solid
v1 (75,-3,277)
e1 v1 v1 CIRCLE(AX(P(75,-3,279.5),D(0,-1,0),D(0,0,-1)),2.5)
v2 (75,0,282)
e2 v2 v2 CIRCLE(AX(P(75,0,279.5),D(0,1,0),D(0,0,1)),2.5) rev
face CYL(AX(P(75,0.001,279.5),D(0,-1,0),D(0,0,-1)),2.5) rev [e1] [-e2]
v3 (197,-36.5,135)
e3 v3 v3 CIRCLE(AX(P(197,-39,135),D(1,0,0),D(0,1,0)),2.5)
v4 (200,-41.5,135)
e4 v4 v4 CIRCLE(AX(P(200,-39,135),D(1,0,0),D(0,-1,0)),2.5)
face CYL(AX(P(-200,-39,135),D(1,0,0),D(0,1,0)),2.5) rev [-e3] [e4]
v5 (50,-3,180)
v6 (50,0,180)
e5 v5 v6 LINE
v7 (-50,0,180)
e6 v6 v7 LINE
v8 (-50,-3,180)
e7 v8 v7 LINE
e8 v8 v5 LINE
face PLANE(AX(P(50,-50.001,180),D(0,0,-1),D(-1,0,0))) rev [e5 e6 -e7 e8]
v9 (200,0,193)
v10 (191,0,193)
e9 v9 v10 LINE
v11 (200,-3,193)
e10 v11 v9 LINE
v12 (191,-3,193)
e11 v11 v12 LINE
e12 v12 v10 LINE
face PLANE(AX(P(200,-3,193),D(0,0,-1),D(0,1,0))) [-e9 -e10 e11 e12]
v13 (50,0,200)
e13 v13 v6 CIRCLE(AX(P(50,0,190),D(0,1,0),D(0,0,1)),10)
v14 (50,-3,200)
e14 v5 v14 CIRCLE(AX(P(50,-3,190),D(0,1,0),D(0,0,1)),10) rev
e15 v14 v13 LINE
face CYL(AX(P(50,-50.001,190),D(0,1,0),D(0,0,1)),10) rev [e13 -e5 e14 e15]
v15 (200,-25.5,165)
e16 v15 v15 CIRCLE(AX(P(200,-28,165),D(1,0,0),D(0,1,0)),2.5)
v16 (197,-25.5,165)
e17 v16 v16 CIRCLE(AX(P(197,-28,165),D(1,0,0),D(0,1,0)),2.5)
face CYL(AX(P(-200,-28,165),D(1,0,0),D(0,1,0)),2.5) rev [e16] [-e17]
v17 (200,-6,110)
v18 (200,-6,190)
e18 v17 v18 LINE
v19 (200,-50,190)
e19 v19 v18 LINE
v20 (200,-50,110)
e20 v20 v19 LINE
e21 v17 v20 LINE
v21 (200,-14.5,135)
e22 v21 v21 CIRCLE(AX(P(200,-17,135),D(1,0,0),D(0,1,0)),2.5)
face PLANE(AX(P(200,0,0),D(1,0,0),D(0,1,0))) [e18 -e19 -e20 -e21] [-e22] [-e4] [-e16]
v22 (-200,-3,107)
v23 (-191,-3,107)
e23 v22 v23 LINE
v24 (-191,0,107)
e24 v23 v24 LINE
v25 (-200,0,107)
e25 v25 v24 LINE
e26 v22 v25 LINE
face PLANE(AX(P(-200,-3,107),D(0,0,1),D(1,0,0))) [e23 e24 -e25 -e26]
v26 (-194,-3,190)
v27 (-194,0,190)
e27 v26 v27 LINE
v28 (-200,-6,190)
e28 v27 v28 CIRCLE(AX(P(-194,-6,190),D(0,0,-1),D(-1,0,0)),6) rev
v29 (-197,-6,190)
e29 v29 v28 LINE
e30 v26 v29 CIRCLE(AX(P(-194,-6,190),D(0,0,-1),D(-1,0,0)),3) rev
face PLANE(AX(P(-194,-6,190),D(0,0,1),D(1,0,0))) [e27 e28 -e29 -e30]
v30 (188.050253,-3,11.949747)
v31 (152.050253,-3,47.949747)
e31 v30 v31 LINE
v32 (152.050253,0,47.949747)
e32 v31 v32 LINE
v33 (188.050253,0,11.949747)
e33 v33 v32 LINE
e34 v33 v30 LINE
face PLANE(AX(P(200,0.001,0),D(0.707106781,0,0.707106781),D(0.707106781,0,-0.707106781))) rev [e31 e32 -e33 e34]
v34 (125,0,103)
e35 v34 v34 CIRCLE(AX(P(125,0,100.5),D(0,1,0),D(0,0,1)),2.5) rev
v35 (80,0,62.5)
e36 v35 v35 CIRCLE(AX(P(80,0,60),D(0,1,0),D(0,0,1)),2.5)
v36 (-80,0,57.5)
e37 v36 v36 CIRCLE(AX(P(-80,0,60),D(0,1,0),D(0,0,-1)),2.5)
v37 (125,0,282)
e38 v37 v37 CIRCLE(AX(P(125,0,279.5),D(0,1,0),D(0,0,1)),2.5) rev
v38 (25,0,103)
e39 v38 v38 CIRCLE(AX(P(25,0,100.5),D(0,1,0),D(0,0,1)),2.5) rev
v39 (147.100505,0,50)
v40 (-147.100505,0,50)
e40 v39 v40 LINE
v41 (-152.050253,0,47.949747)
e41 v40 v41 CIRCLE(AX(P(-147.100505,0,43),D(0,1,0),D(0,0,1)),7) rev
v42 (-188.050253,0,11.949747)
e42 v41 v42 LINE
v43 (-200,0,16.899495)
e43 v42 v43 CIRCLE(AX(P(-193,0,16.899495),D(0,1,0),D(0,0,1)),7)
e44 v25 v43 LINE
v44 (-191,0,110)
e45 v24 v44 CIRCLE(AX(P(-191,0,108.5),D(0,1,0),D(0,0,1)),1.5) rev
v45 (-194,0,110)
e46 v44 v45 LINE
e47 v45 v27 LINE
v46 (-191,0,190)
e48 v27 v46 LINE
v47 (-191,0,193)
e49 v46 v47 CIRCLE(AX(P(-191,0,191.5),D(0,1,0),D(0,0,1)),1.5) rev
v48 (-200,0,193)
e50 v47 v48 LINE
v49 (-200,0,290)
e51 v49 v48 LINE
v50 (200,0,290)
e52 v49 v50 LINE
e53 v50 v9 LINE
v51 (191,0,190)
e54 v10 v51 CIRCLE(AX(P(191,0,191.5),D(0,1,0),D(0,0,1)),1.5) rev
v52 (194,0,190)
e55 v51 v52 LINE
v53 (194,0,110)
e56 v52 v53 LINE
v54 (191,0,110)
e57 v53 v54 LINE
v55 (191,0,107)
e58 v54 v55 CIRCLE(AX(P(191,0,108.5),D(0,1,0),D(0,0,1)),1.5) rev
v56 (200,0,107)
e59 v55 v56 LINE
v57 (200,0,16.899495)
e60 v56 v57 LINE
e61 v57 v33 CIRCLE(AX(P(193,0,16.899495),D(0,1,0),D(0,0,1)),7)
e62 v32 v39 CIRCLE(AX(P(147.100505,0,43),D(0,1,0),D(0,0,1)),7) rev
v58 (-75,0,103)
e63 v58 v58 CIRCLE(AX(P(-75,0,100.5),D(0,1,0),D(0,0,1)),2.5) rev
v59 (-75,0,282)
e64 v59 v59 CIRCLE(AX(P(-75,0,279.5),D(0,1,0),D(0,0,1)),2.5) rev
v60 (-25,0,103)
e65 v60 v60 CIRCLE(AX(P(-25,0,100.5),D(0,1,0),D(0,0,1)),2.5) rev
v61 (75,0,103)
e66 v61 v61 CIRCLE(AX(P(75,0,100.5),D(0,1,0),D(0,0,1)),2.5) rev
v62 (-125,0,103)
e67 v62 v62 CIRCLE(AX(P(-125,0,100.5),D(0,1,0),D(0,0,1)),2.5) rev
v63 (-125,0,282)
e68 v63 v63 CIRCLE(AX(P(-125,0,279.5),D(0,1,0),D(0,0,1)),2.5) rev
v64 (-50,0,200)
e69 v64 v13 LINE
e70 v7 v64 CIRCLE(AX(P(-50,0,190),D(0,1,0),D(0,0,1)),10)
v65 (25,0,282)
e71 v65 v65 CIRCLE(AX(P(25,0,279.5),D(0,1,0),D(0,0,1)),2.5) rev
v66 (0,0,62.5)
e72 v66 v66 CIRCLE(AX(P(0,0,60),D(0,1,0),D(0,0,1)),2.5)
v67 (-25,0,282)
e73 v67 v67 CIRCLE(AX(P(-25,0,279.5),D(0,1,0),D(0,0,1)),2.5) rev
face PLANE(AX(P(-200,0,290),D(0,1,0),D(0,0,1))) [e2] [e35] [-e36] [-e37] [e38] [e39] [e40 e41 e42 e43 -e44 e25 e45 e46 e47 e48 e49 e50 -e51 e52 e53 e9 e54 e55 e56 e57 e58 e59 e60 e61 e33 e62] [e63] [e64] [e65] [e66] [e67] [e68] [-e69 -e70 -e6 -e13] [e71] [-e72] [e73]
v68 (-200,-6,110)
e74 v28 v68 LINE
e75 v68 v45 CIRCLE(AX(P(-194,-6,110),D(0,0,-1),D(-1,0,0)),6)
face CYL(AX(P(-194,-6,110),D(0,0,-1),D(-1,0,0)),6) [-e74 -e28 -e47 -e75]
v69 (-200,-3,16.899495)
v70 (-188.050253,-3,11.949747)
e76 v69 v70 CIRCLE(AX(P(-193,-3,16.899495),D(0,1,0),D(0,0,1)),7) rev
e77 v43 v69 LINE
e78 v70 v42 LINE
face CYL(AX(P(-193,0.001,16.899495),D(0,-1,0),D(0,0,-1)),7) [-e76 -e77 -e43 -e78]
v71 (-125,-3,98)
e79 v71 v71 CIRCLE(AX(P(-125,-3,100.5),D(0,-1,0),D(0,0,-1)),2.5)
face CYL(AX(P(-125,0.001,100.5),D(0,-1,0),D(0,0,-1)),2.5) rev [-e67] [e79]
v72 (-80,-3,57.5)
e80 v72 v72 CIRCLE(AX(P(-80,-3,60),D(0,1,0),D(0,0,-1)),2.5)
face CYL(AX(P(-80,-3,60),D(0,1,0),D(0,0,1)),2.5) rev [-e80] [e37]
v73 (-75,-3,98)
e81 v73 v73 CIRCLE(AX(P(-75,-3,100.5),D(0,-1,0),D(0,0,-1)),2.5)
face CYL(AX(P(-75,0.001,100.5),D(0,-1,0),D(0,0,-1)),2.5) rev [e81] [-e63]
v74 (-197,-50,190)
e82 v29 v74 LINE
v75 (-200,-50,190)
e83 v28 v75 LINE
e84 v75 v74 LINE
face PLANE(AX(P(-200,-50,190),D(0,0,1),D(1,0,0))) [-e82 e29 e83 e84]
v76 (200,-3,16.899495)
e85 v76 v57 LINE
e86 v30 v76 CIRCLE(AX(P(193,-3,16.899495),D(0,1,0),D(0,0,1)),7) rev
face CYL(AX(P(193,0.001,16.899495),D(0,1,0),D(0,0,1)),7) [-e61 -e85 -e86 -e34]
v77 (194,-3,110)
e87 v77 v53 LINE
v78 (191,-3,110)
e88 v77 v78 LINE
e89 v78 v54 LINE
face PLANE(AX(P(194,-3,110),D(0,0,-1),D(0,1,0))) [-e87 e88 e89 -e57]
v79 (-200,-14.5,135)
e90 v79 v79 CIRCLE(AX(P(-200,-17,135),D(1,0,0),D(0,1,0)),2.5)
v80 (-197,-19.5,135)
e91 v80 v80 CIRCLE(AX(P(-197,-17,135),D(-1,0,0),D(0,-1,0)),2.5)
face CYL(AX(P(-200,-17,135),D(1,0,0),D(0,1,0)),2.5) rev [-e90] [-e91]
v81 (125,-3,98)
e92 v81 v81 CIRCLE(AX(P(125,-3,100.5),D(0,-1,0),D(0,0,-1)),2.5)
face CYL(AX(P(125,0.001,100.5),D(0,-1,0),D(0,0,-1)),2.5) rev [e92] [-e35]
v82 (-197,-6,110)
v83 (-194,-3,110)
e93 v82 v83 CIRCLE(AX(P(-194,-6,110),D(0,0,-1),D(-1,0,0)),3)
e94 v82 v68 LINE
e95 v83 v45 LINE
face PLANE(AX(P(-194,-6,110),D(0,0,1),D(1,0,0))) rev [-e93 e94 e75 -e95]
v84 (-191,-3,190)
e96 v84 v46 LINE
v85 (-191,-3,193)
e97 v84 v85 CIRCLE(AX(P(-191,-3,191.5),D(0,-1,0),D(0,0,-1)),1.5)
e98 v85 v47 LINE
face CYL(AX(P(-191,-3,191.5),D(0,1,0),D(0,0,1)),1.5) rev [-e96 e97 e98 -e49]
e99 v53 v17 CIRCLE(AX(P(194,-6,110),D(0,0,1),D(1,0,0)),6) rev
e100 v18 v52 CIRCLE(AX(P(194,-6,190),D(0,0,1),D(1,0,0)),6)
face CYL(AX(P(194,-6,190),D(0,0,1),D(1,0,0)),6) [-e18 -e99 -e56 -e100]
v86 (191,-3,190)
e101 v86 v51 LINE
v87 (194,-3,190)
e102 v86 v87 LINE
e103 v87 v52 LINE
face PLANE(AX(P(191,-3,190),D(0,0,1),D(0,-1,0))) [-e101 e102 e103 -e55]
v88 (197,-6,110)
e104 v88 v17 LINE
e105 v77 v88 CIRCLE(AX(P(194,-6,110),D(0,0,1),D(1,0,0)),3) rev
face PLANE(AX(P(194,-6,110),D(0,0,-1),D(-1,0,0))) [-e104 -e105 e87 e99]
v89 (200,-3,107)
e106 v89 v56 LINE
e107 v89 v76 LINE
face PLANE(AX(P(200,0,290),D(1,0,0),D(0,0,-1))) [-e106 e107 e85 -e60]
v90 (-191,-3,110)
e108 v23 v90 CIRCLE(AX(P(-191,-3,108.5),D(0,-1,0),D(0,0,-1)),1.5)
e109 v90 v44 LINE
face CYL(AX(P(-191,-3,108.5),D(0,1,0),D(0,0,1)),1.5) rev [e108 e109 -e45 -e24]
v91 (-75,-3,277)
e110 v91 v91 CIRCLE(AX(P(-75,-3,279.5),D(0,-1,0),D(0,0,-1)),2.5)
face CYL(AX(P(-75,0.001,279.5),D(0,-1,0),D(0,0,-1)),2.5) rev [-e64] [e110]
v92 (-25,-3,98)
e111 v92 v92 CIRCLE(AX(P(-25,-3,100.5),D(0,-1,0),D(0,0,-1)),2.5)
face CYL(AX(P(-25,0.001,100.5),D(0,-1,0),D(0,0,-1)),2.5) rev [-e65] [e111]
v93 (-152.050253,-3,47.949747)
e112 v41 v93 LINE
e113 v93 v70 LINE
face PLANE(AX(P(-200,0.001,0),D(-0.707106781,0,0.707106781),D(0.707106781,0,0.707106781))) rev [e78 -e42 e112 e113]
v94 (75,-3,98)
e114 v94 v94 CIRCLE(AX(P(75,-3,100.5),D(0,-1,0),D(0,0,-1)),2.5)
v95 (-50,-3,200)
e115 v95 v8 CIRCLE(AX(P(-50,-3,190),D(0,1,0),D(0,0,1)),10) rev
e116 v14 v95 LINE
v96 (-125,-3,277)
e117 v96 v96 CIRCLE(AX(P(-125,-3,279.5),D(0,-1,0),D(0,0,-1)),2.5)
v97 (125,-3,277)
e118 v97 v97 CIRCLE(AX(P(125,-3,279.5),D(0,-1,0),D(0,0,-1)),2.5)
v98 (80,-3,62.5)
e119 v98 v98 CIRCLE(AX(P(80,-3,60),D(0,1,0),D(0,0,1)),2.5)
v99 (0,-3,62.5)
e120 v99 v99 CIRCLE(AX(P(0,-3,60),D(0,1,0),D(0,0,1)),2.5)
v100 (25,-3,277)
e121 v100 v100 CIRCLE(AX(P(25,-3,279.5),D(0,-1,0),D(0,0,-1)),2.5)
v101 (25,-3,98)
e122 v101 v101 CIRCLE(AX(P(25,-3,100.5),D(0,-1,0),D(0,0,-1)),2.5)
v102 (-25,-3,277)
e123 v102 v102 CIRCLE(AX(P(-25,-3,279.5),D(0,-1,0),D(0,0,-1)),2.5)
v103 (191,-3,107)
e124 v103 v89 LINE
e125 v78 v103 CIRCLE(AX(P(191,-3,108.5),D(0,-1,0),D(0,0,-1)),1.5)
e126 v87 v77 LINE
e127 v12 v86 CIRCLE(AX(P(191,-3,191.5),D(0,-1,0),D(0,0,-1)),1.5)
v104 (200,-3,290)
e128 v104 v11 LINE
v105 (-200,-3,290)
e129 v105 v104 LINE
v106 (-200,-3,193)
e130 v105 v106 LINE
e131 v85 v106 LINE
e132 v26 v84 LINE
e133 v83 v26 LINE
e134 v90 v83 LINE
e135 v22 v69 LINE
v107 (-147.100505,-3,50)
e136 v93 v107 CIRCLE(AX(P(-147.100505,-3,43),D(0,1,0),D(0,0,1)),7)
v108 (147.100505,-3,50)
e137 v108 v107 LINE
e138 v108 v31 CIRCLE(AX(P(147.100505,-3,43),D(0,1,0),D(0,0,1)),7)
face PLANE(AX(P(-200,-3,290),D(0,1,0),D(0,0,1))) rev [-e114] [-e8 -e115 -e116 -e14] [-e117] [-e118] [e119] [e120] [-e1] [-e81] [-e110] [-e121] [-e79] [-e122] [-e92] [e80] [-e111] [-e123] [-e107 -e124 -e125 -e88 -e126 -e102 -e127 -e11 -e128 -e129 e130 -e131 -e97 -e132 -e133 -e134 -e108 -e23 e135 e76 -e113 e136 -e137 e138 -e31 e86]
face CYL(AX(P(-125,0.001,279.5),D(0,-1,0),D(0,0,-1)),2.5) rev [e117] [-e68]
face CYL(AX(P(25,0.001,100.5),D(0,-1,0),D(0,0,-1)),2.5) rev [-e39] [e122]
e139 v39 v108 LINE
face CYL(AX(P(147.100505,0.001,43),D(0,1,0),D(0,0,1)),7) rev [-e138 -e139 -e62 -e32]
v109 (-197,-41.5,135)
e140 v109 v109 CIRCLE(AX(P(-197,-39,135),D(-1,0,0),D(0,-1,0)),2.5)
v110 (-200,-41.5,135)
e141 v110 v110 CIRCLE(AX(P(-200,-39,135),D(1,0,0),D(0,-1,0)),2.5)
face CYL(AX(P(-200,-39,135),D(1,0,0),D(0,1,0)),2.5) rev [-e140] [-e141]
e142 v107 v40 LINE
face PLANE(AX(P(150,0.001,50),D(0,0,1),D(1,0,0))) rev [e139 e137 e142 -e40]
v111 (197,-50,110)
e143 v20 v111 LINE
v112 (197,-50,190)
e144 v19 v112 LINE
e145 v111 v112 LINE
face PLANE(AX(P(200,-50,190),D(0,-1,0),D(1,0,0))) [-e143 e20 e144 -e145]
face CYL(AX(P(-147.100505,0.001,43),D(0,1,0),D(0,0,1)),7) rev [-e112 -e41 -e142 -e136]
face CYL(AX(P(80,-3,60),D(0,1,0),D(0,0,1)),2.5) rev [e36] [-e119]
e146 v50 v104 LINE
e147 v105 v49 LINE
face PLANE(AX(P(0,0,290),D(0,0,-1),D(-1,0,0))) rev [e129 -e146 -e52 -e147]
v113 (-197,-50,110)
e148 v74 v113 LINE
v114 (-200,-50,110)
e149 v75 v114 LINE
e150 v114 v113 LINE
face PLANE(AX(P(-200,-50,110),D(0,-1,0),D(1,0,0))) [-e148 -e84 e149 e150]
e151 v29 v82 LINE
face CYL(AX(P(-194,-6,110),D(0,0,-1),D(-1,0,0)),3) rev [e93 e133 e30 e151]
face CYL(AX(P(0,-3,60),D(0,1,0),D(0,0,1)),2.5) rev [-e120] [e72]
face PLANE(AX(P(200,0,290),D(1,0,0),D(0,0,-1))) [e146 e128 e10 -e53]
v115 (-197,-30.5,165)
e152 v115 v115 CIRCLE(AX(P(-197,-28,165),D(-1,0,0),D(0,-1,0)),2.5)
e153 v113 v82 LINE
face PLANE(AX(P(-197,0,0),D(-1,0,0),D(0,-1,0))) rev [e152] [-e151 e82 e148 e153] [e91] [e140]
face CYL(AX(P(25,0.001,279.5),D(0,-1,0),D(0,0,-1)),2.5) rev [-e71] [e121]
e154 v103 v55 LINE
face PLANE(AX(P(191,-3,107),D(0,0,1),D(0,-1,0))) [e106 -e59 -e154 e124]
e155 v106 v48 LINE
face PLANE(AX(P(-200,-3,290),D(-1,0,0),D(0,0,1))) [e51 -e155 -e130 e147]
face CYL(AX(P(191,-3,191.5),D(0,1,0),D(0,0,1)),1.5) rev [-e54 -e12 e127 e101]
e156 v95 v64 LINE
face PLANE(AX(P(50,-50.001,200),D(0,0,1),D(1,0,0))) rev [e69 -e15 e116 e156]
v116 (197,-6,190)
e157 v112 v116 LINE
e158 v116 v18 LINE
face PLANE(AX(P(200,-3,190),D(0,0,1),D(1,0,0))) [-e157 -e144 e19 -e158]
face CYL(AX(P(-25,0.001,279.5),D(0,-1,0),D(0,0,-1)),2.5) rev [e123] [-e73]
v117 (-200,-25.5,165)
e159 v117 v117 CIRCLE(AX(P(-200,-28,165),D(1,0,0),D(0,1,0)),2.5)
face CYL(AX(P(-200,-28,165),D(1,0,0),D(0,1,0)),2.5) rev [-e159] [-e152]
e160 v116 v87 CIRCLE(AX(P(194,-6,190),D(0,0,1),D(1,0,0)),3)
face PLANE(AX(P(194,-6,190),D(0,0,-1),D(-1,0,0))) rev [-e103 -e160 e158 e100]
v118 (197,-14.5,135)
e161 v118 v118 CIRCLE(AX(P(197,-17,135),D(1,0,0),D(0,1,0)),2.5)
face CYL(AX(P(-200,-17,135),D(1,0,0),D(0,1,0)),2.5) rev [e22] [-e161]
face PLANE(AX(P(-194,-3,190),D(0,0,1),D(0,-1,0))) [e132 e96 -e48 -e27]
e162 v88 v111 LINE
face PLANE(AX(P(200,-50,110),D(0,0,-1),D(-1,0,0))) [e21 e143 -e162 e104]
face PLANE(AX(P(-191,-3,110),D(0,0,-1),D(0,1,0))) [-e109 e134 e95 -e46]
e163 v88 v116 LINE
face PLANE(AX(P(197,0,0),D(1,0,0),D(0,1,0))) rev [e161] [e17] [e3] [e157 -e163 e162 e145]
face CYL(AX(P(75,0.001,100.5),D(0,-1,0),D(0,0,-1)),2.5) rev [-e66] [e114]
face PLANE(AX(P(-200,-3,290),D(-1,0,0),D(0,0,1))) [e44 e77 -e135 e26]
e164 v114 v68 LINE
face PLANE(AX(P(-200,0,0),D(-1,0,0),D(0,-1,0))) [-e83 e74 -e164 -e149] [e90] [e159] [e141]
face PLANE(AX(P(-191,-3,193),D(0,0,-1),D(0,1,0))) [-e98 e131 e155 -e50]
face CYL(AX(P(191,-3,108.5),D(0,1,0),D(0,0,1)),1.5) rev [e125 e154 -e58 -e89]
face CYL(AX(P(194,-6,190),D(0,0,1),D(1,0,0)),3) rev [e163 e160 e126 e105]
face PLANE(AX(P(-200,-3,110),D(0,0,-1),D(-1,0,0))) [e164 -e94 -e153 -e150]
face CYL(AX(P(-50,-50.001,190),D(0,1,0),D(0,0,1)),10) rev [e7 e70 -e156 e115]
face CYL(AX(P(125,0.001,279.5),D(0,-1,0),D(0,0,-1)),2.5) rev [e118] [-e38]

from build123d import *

# Parameters (mm, degrees)
SKETCH1_W                = 400
SKETCH1_H                = 3
BASE_FLANGE1_DEPTH       = 290
CUT_EXTRUDE1_REACH       = 354.291
EDGE_FLANGE1_START       = -6
EDGE_FLANGE1_DEPTH       = 7
EDGE_FLANGE1_START_2     = -0.31686
EDGE_FLANGE1_2_OUTLINE_W = 3
EDGE_FLANGE1_2_OUTLINE_H = 80
EDGE_FLANGE1_2_DEPTH     = 1.31686
EDGE_FLANGE1_START_3     = -50
EDGE_FLANGE1_3_OUTLINE_W = 3
EDGE_FLANGE1_3_OUTLINE_H = 80
EDGE_FLANGE1_3_DEPTH     = 44
EDGE_FLANGE1_START_4     = 110
EDGE_FLANGE1_4_DEPTH     = 80
EDGE_FLANGE1_5_DEPTH     = 80
SKETCH15_R               = 2.5
CUT_EXTRUDE2_DEPTH       = 497.588360717
FILLET1_R                = 7
SKETCH16_R               = 2.5
CUT_EXTRUDE3_DEPTH       = 10
CUT_EXTRUDE4_REACH       = 357.4
SKETCH17_R               = 2.5
CUT_EXTRUDE5_REACH       = 357.809


with BuildPart() as part:
    # Base-Flange1: sheet metal written as solids
    # Sketch1 → Base-Flange1 (new body)
    with BuildSketch(Plane.XY):
        with Locations((0, -1.5)):
            Rectangle(SKETCH1_W, SKETCH1_H)
    extrude(amount=BASE_FLANGE1_DEPTH)

    # Sketch6 → Cut-Extrude1 (cut, up to next)
    with BuildSketch(Plane.XZ.offset(3), mode=Mode.PRIVATE) as cut_extrude1_sk1:
        Polygon((200, 0), (150, 50), (-150, 50), (-200, 0), align=None)
    cut_extrude1_tool1 = extrude(cut_extrude1_sk1.sketch, amount=-CUT_EXTRUDE1_REACH, mode=Mode.PRIVATE) & part.part
    add(cut_extrude1_tool1.solids().sort_by_distance((0, -3, 23.809524))[0], mode=Mode.SUBTRACT)

    # Edge-Flange1: read off the stored shape, not the designer's step
    # Edge-Flange1 outline → Edge-Flange1 (cut)
    with BuildSketch(Plane(origin=(0, 0, 0), x_dir=(1, 0, 0), z_dir=(0, 1, 0)).offset(EDGE_FLANGE1_START)):
        with BuildLine():
            Line((200, -193), (200, -190))
            Line((200, -190), (191, -190))
            ThreePointArc((191, -190), (189.5, -191.5), (191, -193))
            Line((191, -193), (200, -193))
        make_face()
        with BuildLine():
            Line((191, -110), (200, -110))
            Line((200, -110), (200, -107))
            Line((200, -107), (191, -107))
            ThreePointArc((191, -107), (189.5, -108.5), (191, -110))
        make_face()
        with BuildLine():
            Line((-200, -107), (-200, -110))
            Line((-200, -110), (-191, -110))
            ThreePointArc((-191, -110), (-189.5, -108.5), (-191, -107))
            Line((-191, -107), (-200, -107))
        make_face()
        with BuildLine():
            Line((-191, -190), (-200, -190))
            Line((-200, -190), (-200, -193))
            Line((-200, -193), (-191, -193))
            ThreePointArc((-191, -193), (-189.5, -191.5), (-191, -190))
        make_face()
    extrude(amount=EDGE_FLANGE1_DEPTH, mode=Mode.SUBTRACT)

    # Edge-Flange1 2 outline → Edge-Flange1 2 (cut)
    with BuildSketch(Plane(origin=(0, 0, 0), x_dir=(1, 0, 0), z_dir=(0, 1, 0)).offset(EDGE_FLANGE1_START_2)):
        with Locations((198.5, -150)):
            Rectangle(EDGE_FLANGE1_2_OUTLINE_W, EDGE_FLANGE1_2_OUTLINE_H)
        with Locations((-198.5, -150)):
            Rectangle(EDGE_FLANGE1_2_OUTLINE_W, EDGE_FLANGE1_2_OUTLINE_H)
    extrude(amount=EDGE_FLANGE1_2_DEPTH, mode=Mode.SUBTRACT)

    # Edge-Flange1 4 outline → Edge-Flange1 4 (cut)
    with BuildSketch(Plane.XY.offset(EDGE_FLANGE1_START_4)):
        with BuildLine():
            Line((-200, -3), (-199.196152423, -3))
            ThreePointArc((-199.196152423, -3), (-197, -0.803847577), (-194, 0))
            Line((-194, 0), (-197, 0))
            Line((-197, 0), (-197, -0.31686))
            Line((-197, -0.31686), (-200, -0.31686))
            Line((-200, -0.31686), (-200, -3))
        make_face()
        with BuildLine():
            Line((197, 0), (194, 0))
            ThreePointArc((194, 0), (197, -0.803847577), (199.196152423, -3))
            Line((199.196152423, -3), (200, -3))
            Line((200, -3), (200, -0.31686))
            Line((200, -0.31686), (197, -0.31686))
            Line((197, -0.31686), (197, 0))
        make_face()
    extrude(amount=EDGE_FLANGE1_4_DEPTH, mode=Mode.SUBTRACT)



with BuildPart() as body_2:
    # Edge-Flange1 3 outline → Edge-Flange1 3 (new body)
    with BuildSketch(Plane(origin=(0, 0, 0), x_dir=(1, 0, 0), z_dir=(0, 1, 0)).offset(EDGE_FLANGE1_START_3)):
        with Locations((198.5, -150)):
            Rectangle(EDGE_FLANGE1_3_OUTLINE_W, EDGE_FLANGE1_3_OUTLINE_H)
        with Locations((-198.5, -150)):
            Rectangle(EDGE_FLANGE1_3_OUTLINE_W, EDGE_FLANGE1_3_OUTLINE_H)
    extrude(amount=EDGE_FLANGE1_3_DEPTH)


with BuildPart() as part_1:
    add(part.part)

    add(body_2.part)  # Edge-Flange1 5 merges body 2
    # Edge-Flange1 5 outline → Edge-Flange1 5 (add)
    with BuildSketch(Plane.XY.offset(EDGE_FLANGE1_START_4)):
        with BuildLine():
            ThreePointArc((-199.196152423, -3), (-199.795554958, -4.447085729), (-200, -6))
            Line((-200, -6), (-197, -6))
            ThreePointArc((-197, -6), (-196.121320344, -3.878679656), (-194, -3))
            Line((-194, -3), (-199.196152423, -3))
        make_face()
        with BuildLine():
            Line((199.196152423, -3), (194, -3))
            ThreePointArc((194, -3), (196.121320344, -3.878679656), (197, -6))
            Line((197, -6), (200, -6))
            ThreePointArc((200, -6), (199.795554958, -4.447085729), (199.196152423, -3))
        make_face()
    extrude(amount=EDGE_FLANGE1_5_DEPTH)

    # Sketch15 → Cut-Extrude2 (cut, through all)
    with BuildSketch(Plane(origin=(200, 0, 0), x_dir=(0, 0, -1), z_dir=(1, 0, 0))):
        with Locations(Location((-165, -28, 0), (0, 0, 90))):
            Circle(SKETCH15_R)
        with Locations(Location((-135, -17, 0), (0, 0, 90))):
            Circle(SKETCH15_R)
        with Locations(Location((-135, -39, 0), (0, 0, 90))):
            Circle(SKETCH15_R)
    extrude(amount=-CUT_EXTRUDE2_DEPTH, mode=Mode.SUBTRACT)

    # Fillet1
    fillet1_edges = [part_1.edges().sort_by_distance(p)[0] for p in [
        (-150, -1.5, 50),
        (150, -1.5, 50),
        (-200, -1.5, 0),
        (200, -1.5, 0),
    ]]
    fillet(fillet1_edges, radius=FILLET1_R)

    # Sketch16 → Cut-Extrude3 (cut)
    with BuildSketch(Plane(origin=(0, 0, 0), x_dir=(1, 0, 0), z_dir=(0, 1, 0))):
        with Locations(Location((0, -60, 0), (0, 0, 270))):
            Circle(SKETCH16_R)
        with Locations(Location((80, -60, 0), (0, 0, 270))):
            Circle(SKETCH16_R)
        with Locations(Location((-80, -60, 0), (0, 0, 90))):
            Circle(SKETCH16_R)
    extrude(amount=-CUT_EXTRUDE3_DEPTH, mode=Mode.SUBTRACT)

    # Sketch17 → Cut-Extrude4 (cut, up to next)
    with BuildSketch(Plane.XZ.offset(3), mode=Mode.PRIVATE) as cut_extrude4_sk1:
        with Locations(Location((-125, 279.5, 0), (0, 0, 270))):
            Circle(SKETCH17_R)
    cut_extrude4_tool1 = extrude(cut_extrude4_sk1.sketch, amount=-CUT_EXTRUDE4_REACH, mode=Mode.PRIVATE) & part_1.part
    # Sketch17 → Cut-Extrude4 (cut, up to next)
    with BuildSketch(Plane.XZ.offset(3), mode=Mode.PRIVATE) as cut_extrude4_sk2:
        with Locations(Location((-125, 100.5, 0), (0, 0, 270))):
            Circle(SKETCH17_R)
    cut_extrude4_tool2 = extrude(cut_extrude4_sk2.sketch, amount=-CUT_EXTRUDE4_REACH, mode=Mode.PRIVATE) & part_1.part
    # Sketch17 → Cut-Extrude4 (cut, up to next)
    with BuildSketch(Plane.XZ.offset(3), mode=Mode.PRIVATE) as cut_extrude4_sk3:
        with Locations(Location((-75, 279.5, 0), (0, 0, 270))):
            Circle(SKETCH17_R)
    cut_extrude4_tool3 = extrude(cut_extrude4_sk3.sketch, amount=-CUT_EXTRUDE4_REACH, mode=Mode.PRIVATE) & part_1.part
    # Sketch17 → Cut-Extrude4 (cut, up to next)
    with BuildSketch(Plane.XZ.offset(3), mode=Mode.PRIVATE) as cut_extrude4_sk4:
        with Locations(Location((-75, 100.5, 0), (0, 0, 270))):
            Circle(SKETCH17_R)
    cut_extrude4_tool4 = extrude(cut_extrude4_sk4.sketch, amount=-CUT_EXTRUDE4_REACH, mode=Mode.PRIVATE) & part_1.part
    # Sketch17 → Cut-Extrude4 (cut, up to next)
    with BuildSketch(Plane.XZ.offset(3), mode=Mode.PRIVATE) as cut_extrude4_sk5:
        with Locations(Location((-25, 279.5, 0), (0, 0, 270))):
            Circle(SKETCH17_R)
    cut_extrude4_tool5 = extrude(cut_extrude4_sk5.sketch, amount=-CUT_EXTRUDE4_REACH, mode=Mode.PRIVATE) & part_1.part
    # Sketch17 → Cut-Extrude4 (cut, up to next)
    with BuildSketch(Plane.XZ.offset(3), mode=Mode.PRIVATE) as cut_extrude4_sk6:
        with Locations(Location((-25, 100.5, 0), (0, 0, 270))):
            Circle(SKETCH17_R)
    cut_extrude4_tool6 = extrude(cut_extrude4_sk6.sketch, amount=-CUT_EXTRUDE4_REACH, mode=Mode.PRIVATE) & part_1.part
    # Sketch17 → Cut-Extrude4 (cut, up to next)
    with BuildSketch(Plane.XZ.offset(3), mode=Mode.PRIVATE) as cut_extrude4_sk7:
        with Locations(Location((25, 279.5, 0), (0, 0, 270))):
            Circle(SKETCH17_R)
    cut_extrude4_tool7 = extrude(cut_extrude4_sk7.sketch, amount=-CUT_EXTRUDE4_REACH, mode=Mode.PRIVATE) & part_1.part
    # Sketch17 → Cut-Extrude4 (cut, up to next)
    with BuildSketch(Plane.XZ.offset(3), mode=Mode.PRIVATE) as cut_extrude4_sk8:
        with Locations(Location((25, 100.5, 0), (0, 0, 270))):
            Circle(SKETCH17_R)
    cut_extrude4_tool8 = extrude(cut_extrude4_sk8.sketch, amount=-CUT_EXTRUDE4_REACH, mode=Mode.PRIVATE) & part_1.part
    # Sketch17 → Cut-Extrude4 (cut, up to next)
    with BuildSketch(Plane.XZ.offset(3), mode=Mode.PRIVATE) as cut_extrude4_sk9:
        with Locations(Location((75, 279.5, 0), (0, 0, 270))):
            Circle(SKETCH17_R)
    cut_extrude4_tool9 = extrude(cut_extrude4_sk9.sketch, amount=-CUT_EXTRUDE4_REACH, mode=Mode.PRIVATE) & part_1.part
    # Sketch17 → Cut-Extrude4 (cut, up to next)
    with BuildSketch(Plane.XZ.offset(3), mode=Mode.PRIVATE) as cut_extrude4_sk10:
        with Locations(Location((75, 100.5, 0), (0, 0, 270))):
            Circle(SKETCH17_R)
    cut_extrude4_tool10 = extrude(cut_extrude4_sk10.sketch, amount=-CUT_EXTRUDE4_REACH, mode=Mode.PRIVATE) & part_1.part
    # Sketch17 → Cut-Extrude4 (cut, up to next)
    with BuildSketch(Plane.XZ.offset(3), mode=Mode.PRIVATE) as cut_extrude4_sk11:
        with Locations(Location((125, 279.5, 0), (0, 0, 270))):
            Circle(SKETCH17_R)
    cut_extrude4_tool11 = extrude(cut_extrude4_sk11.sketch, amount=-CUT_EXTRUDE4_REACH, mode=Mode.PRIVATE) & part_1.part
    # Sketch17 → Cut-Extrude4 (cut, up to next)
    with BuildSketch(Plane.XZ.offset(3), mode=Mode.PRIVATE) as cut_extrude4_sk12:
        with Locations(Location((125, 100.5, 0), (0, 0, 270))):
            Circle(SKETCH17_R)
    cut_extrude4_tool12 = extrude(cut_extrude4_sk12.sketch, amount=-CUT_EXTRUDE4_REACH, mode=Mode.PRIVATE) & part_1.part
    add(cut_extrude4_tool1.solids().sort_by_distance((-125, -3, 279.5))[0], mode=Mode.SUBTRACT)
    add(cut_extrude4_tool2.solids().sort_by_distance((-125, -3, 100.5))[0], mode=Mode.SUBTRACT)
    add(cut_extrude4_tool3.solids().sort_by_distance((-75, -3, 279.5))[0], mode=Mode.SUBTRACT)
    add(cut_extrude4_tool4.solids().sort_by_distance((-75, -3, 100.5))[0], mode=Mode.SUBTRACT)
    add(cut_extrude4_tool5.solids().sort_by_distance((-25, -3, 279.5))[0], mode=Mode.SUBTRACT)
    add(cut_extrude4_tool6.solids().sort_by_distance((-25, -3, 100.5))[0], mode=Mode.SUBTRACT)
    add(cut_extrude4_tool7.solids().sort_by_distance((25, -3, 279.5))[0], mode=Mode.SUBTRACT)
    add(cut_extrude4_tool8.solids().sort_by_distance((25, -3, 100.5))[0], mode=Mode.SUBTRACT)
    add(cut_extrude4_tool9.solids().sort_by_distance((75, -3, 279.5))[0], mode=Mode.SUBTRACT)
    add(cut_extrude4_tool10.solids().sort_by_distance((75, -3, 100.5))[0], mode=Mode.SUBTRACT)
    add(cut_extrude4_tool11.solids().sort_by_distance((125, -3, 279.5))[0], mode=Mode.SUBTRACT)
    add(cut_extrude4_tool12.solids().sort_by_distance((125, -3, 100.5))[0], mode=Mode.SUBTRACT)

    # Sketch18 → Cut-Extrude5 (cut, up to next)
    with BuildSketch(Plane(origin=(0, 0, 0), x_dir=(1, 0, 0), z_dir=(0, 1, 0)), mode=Mode.PRIVATE) as cut_extrude5_sk1:
        with BuildLine():
            Line((50, -200), (-50, -200))
            ThreePointArc((-50, -200), (-60, -190), (-50, -180))
            Line((-50, -180), (50, -180))
            ThreePointArc((50, -180), (60, -190), (50, -200))
        make_face()
    cut_extrude5_tool1 = extrude(cut_extrude5_sk1.sketch, amount=-CUT_EXTRUDE5_REACH, mode=Mode.PRIVATE) & part_1.part
    add(cut_extrude5_tool1.solids().sort_by_distance((0, 0, 190))[0], mode=Mode.SUBTRACT)


solid = part_1.part
